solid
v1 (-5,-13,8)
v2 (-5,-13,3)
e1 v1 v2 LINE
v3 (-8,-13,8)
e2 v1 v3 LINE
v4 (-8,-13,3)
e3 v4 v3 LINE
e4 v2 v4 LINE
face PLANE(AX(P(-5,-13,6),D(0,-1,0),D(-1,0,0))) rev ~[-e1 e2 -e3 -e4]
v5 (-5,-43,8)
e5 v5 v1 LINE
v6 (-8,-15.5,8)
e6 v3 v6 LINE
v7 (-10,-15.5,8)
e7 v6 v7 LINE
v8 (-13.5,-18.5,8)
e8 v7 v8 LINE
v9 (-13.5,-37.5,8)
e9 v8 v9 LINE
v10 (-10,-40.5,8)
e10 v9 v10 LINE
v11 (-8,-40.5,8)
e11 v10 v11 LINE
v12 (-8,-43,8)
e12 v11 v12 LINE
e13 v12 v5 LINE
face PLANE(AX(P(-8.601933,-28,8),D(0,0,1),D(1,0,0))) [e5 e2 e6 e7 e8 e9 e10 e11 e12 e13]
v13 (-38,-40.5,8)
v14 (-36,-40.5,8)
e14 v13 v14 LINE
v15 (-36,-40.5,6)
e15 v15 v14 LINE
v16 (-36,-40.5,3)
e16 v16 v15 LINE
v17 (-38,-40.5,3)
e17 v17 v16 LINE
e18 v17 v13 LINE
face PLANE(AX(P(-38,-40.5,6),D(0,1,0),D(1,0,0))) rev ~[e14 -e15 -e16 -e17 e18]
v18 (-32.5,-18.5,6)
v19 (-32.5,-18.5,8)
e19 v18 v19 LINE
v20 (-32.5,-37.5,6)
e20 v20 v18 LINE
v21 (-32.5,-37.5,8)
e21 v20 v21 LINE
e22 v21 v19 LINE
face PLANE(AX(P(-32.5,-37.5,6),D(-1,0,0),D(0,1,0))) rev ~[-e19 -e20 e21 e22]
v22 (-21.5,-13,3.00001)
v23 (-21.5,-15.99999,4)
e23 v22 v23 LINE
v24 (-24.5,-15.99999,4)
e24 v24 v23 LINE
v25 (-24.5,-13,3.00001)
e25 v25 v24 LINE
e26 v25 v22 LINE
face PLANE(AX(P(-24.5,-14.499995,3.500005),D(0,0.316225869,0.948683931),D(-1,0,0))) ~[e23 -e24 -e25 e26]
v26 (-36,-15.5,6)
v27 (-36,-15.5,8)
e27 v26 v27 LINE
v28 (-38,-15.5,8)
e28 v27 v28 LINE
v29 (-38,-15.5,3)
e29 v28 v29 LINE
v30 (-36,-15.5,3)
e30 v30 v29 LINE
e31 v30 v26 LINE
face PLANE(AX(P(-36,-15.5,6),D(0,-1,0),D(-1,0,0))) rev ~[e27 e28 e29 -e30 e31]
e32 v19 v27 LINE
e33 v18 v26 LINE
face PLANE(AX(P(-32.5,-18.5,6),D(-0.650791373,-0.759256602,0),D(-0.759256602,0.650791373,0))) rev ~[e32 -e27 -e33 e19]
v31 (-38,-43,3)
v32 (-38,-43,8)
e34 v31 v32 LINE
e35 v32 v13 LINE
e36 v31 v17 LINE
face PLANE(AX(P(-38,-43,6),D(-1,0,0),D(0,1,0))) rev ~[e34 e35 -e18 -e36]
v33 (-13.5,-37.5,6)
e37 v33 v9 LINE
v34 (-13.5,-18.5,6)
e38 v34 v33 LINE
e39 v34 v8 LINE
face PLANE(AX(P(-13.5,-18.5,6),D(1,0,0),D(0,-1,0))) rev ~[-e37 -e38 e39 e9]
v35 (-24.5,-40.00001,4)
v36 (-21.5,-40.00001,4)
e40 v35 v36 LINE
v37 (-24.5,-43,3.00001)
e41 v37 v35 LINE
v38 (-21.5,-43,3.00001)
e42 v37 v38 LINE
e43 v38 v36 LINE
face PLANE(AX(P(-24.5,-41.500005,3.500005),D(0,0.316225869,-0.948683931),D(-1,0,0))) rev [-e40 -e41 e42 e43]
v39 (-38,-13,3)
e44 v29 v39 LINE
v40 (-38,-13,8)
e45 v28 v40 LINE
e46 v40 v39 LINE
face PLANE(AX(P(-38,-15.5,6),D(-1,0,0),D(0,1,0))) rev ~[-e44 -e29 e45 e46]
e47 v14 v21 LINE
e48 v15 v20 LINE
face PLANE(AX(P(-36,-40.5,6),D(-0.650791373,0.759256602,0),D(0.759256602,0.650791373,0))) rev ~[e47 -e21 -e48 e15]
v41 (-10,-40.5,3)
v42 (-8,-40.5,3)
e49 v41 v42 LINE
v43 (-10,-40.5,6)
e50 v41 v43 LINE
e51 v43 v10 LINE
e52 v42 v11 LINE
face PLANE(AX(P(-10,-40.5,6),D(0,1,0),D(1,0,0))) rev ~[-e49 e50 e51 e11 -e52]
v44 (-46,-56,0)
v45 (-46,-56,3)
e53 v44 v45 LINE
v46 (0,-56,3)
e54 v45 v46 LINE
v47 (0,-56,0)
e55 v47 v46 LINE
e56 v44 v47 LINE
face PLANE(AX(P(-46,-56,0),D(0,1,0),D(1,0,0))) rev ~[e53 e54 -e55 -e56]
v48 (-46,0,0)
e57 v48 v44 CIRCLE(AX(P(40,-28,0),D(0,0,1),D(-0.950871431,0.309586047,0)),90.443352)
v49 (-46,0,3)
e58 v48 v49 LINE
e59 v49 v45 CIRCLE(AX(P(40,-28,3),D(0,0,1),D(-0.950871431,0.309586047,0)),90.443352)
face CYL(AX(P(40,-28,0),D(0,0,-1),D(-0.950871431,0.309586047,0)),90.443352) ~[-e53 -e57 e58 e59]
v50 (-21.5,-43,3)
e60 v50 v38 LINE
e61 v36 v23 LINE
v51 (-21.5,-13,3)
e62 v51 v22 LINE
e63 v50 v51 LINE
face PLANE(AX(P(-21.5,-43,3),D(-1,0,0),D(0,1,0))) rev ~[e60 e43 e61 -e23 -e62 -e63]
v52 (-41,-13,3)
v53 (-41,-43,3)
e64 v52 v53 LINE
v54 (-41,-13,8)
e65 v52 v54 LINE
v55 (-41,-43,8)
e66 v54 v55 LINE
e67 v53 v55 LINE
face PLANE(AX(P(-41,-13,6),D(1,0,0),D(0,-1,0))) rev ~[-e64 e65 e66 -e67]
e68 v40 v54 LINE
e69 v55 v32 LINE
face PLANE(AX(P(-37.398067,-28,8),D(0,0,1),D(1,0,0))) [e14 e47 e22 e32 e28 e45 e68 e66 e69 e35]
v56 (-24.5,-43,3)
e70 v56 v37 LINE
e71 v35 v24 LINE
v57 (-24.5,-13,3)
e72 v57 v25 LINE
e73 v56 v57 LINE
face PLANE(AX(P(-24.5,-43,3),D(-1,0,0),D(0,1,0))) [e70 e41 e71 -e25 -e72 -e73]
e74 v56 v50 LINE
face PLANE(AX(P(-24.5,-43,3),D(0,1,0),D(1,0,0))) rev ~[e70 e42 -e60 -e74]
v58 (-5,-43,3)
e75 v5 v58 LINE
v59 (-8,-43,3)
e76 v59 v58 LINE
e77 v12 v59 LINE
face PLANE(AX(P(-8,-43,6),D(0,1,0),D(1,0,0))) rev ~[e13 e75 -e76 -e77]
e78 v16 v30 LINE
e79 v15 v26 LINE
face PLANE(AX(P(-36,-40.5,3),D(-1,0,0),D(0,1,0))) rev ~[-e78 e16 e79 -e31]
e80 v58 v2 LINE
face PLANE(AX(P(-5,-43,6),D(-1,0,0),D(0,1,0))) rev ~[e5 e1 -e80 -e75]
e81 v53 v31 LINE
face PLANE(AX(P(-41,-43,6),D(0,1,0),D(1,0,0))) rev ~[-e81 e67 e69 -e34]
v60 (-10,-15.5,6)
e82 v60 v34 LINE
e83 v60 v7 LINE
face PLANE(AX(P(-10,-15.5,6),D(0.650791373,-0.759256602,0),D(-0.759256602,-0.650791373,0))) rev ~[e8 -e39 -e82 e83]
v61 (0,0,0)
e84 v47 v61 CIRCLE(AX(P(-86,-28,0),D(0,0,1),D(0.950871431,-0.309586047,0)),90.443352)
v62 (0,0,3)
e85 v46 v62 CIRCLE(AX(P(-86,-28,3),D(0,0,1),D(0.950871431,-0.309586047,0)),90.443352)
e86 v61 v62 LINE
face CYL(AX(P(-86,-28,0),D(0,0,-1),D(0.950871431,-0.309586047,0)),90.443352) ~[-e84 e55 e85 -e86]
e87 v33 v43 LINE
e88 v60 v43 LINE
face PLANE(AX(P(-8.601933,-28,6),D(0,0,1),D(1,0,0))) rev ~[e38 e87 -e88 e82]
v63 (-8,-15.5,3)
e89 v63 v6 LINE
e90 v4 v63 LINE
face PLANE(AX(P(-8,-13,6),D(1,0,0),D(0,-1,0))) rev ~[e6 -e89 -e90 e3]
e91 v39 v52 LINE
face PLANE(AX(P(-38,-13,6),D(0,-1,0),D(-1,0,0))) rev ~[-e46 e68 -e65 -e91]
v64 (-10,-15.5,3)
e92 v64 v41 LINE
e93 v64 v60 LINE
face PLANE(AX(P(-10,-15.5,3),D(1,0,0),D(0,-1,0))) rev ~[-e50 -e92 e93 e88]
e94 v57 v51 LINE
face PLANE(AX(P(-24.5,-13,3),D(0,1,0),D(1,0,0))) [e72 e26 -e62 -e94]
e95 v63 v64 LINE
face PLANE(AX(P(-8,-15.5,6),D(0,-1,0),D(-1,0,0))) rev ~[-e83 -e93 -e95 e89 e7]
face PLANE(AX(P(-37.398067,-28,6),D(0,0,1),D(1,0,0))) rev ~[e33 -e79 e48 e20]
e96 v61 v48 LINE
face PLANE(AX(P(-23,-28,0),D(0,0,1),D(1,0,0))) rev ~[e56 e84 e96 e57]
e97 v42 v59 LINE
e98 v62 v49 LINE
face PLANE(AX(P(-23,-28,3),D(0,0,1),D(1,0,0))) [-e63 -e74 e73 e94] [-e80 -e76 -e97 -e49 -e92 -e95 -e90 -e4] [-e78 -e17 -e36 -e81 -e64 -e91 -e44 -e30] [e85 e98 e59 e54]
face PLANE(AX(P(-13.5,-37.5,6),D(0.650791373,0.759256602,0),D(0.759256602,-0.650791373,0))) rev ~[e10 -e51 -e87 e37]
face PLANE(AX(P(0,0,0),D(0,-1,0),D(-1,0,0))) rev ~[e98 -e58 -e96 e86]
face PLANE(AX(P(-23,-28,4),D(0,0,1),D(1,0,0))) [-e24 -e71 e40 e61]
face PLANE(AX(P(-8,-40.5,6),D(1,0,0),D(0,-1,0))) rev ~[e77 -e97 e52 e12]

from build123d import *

# Parameters (mm, degrees)
F1_DEPTH    = 3
F3_DEPTH    = 3
F5_DEPTH    = 2
F7_DEPTH    = 2
F8_W        = 3
F8_H        = 30
F9_DEPTH    = 1
F10_SIZE2   = 2.99999
F10_SIZE    = 0.99999
F10_2_SIZE2 = 2.99999
F10_2_SIZE  = 0.99999


# Not quite as in the source:
# - a fillet or chamfer is up to 0.001 mm smaller than in the source, because OpenCascade refuses the exact size


with BuildPart() as f1:
    # F0 (on Top) → F1 (new body)
    with BuildSketch(Plane.XY):
        with BuildLine():
            ThreePointArc((0, -56), (4.4433524368, -28), (0, 0))
            Line((0, 0), (-46, 0))
            ThreePointArc((-46, 0), (-50.4433524368, -28), (-46, -56))
            Line((-46, -56), (0, -56))
        make_face()
    extrude(amount=F1_DEPTH)

    # F2 (on face) → F3 (join)
    with BuildSketch(Plane.XY.offset(3)):
        Polygon((-38, -13), (-41, -13), (-41, -43), (-38, -43), (-38, -40.5), (-36, -40.5), (-36, -15.5), (-38, -15.5), align=None)
        Polygon((-5, -43), (-5, -13), (-8, -13), (-8, -15.5), (-10, -15.5), (-10, -40.5), (-8, -40.5), (-8, -43), align=None)
    extrude(amount=F3_DEPTH)

    # F4 (on face) → F5 (join)
    with BuildSketch(Plane.XY.offset(6)):
        Polygon((-38, -13), (-41, -13), (-41, -43), (-38, -43), (-38, -40.5), (-36, -40.5), (-32.5, -37.5), (-32.5, -18.5), (-36, -15.5), (-38, -15.5), align=None)
    extrude(amount=F5_DEPTH)

    # F6 (on face) → F7 (join)
    with BuildSketch(Plane.XY.offset(6)):
        Polygon((-5, -13), (-8, -13), (-8, -15.5), (-10, -15.5), (-13.5, -18.5), (-13.5, -37.5), (-10, -40.5), (-8, -40.5), (-8, -43), (-5, -43), align=None)
    extrude(amount=F7_DEPTH)

    # F8 (on face) → F9 (join)
    with BuildSketch(Plane.XY.offset(3)):
        with Locations((-23, -28)):
            Rectangle(F8_W, F8_H)
    extrude(amount=F9_DEPTH)

    # F10 (size 1 and 3 in the source; OpenCascade refuses exactly that, so slightly less here)
    f10_edges = [f1.edges().sort_by_distance(p)[0] for p in [
        (-23, -13, 4),
    ]]
    f10_side = f1.faces().sort_by_distance((-23, -13, 3.5))[0]
    chamfer(f10_edges, length=F10_SIZE, length2=F10_SIZE2, reference=f10_side)

    # F10#2 (size 1 and 3 in the source; OpenCascade refuses exactly that, so slightly less here)
    f10_2_edges = [f1.edges().sort_by_distance(p)[0] for p in [
        (-23, -43, 4),
    ]]
    f10_2_side = f1.faces().sort_by_distance((-23, -43, 3.5))[0]
    chamfer(f10_2_edges, length=F10_2_SIZE, length2=F10_2_SIZE2, reference=f10_2_side)


solid = f1.part
